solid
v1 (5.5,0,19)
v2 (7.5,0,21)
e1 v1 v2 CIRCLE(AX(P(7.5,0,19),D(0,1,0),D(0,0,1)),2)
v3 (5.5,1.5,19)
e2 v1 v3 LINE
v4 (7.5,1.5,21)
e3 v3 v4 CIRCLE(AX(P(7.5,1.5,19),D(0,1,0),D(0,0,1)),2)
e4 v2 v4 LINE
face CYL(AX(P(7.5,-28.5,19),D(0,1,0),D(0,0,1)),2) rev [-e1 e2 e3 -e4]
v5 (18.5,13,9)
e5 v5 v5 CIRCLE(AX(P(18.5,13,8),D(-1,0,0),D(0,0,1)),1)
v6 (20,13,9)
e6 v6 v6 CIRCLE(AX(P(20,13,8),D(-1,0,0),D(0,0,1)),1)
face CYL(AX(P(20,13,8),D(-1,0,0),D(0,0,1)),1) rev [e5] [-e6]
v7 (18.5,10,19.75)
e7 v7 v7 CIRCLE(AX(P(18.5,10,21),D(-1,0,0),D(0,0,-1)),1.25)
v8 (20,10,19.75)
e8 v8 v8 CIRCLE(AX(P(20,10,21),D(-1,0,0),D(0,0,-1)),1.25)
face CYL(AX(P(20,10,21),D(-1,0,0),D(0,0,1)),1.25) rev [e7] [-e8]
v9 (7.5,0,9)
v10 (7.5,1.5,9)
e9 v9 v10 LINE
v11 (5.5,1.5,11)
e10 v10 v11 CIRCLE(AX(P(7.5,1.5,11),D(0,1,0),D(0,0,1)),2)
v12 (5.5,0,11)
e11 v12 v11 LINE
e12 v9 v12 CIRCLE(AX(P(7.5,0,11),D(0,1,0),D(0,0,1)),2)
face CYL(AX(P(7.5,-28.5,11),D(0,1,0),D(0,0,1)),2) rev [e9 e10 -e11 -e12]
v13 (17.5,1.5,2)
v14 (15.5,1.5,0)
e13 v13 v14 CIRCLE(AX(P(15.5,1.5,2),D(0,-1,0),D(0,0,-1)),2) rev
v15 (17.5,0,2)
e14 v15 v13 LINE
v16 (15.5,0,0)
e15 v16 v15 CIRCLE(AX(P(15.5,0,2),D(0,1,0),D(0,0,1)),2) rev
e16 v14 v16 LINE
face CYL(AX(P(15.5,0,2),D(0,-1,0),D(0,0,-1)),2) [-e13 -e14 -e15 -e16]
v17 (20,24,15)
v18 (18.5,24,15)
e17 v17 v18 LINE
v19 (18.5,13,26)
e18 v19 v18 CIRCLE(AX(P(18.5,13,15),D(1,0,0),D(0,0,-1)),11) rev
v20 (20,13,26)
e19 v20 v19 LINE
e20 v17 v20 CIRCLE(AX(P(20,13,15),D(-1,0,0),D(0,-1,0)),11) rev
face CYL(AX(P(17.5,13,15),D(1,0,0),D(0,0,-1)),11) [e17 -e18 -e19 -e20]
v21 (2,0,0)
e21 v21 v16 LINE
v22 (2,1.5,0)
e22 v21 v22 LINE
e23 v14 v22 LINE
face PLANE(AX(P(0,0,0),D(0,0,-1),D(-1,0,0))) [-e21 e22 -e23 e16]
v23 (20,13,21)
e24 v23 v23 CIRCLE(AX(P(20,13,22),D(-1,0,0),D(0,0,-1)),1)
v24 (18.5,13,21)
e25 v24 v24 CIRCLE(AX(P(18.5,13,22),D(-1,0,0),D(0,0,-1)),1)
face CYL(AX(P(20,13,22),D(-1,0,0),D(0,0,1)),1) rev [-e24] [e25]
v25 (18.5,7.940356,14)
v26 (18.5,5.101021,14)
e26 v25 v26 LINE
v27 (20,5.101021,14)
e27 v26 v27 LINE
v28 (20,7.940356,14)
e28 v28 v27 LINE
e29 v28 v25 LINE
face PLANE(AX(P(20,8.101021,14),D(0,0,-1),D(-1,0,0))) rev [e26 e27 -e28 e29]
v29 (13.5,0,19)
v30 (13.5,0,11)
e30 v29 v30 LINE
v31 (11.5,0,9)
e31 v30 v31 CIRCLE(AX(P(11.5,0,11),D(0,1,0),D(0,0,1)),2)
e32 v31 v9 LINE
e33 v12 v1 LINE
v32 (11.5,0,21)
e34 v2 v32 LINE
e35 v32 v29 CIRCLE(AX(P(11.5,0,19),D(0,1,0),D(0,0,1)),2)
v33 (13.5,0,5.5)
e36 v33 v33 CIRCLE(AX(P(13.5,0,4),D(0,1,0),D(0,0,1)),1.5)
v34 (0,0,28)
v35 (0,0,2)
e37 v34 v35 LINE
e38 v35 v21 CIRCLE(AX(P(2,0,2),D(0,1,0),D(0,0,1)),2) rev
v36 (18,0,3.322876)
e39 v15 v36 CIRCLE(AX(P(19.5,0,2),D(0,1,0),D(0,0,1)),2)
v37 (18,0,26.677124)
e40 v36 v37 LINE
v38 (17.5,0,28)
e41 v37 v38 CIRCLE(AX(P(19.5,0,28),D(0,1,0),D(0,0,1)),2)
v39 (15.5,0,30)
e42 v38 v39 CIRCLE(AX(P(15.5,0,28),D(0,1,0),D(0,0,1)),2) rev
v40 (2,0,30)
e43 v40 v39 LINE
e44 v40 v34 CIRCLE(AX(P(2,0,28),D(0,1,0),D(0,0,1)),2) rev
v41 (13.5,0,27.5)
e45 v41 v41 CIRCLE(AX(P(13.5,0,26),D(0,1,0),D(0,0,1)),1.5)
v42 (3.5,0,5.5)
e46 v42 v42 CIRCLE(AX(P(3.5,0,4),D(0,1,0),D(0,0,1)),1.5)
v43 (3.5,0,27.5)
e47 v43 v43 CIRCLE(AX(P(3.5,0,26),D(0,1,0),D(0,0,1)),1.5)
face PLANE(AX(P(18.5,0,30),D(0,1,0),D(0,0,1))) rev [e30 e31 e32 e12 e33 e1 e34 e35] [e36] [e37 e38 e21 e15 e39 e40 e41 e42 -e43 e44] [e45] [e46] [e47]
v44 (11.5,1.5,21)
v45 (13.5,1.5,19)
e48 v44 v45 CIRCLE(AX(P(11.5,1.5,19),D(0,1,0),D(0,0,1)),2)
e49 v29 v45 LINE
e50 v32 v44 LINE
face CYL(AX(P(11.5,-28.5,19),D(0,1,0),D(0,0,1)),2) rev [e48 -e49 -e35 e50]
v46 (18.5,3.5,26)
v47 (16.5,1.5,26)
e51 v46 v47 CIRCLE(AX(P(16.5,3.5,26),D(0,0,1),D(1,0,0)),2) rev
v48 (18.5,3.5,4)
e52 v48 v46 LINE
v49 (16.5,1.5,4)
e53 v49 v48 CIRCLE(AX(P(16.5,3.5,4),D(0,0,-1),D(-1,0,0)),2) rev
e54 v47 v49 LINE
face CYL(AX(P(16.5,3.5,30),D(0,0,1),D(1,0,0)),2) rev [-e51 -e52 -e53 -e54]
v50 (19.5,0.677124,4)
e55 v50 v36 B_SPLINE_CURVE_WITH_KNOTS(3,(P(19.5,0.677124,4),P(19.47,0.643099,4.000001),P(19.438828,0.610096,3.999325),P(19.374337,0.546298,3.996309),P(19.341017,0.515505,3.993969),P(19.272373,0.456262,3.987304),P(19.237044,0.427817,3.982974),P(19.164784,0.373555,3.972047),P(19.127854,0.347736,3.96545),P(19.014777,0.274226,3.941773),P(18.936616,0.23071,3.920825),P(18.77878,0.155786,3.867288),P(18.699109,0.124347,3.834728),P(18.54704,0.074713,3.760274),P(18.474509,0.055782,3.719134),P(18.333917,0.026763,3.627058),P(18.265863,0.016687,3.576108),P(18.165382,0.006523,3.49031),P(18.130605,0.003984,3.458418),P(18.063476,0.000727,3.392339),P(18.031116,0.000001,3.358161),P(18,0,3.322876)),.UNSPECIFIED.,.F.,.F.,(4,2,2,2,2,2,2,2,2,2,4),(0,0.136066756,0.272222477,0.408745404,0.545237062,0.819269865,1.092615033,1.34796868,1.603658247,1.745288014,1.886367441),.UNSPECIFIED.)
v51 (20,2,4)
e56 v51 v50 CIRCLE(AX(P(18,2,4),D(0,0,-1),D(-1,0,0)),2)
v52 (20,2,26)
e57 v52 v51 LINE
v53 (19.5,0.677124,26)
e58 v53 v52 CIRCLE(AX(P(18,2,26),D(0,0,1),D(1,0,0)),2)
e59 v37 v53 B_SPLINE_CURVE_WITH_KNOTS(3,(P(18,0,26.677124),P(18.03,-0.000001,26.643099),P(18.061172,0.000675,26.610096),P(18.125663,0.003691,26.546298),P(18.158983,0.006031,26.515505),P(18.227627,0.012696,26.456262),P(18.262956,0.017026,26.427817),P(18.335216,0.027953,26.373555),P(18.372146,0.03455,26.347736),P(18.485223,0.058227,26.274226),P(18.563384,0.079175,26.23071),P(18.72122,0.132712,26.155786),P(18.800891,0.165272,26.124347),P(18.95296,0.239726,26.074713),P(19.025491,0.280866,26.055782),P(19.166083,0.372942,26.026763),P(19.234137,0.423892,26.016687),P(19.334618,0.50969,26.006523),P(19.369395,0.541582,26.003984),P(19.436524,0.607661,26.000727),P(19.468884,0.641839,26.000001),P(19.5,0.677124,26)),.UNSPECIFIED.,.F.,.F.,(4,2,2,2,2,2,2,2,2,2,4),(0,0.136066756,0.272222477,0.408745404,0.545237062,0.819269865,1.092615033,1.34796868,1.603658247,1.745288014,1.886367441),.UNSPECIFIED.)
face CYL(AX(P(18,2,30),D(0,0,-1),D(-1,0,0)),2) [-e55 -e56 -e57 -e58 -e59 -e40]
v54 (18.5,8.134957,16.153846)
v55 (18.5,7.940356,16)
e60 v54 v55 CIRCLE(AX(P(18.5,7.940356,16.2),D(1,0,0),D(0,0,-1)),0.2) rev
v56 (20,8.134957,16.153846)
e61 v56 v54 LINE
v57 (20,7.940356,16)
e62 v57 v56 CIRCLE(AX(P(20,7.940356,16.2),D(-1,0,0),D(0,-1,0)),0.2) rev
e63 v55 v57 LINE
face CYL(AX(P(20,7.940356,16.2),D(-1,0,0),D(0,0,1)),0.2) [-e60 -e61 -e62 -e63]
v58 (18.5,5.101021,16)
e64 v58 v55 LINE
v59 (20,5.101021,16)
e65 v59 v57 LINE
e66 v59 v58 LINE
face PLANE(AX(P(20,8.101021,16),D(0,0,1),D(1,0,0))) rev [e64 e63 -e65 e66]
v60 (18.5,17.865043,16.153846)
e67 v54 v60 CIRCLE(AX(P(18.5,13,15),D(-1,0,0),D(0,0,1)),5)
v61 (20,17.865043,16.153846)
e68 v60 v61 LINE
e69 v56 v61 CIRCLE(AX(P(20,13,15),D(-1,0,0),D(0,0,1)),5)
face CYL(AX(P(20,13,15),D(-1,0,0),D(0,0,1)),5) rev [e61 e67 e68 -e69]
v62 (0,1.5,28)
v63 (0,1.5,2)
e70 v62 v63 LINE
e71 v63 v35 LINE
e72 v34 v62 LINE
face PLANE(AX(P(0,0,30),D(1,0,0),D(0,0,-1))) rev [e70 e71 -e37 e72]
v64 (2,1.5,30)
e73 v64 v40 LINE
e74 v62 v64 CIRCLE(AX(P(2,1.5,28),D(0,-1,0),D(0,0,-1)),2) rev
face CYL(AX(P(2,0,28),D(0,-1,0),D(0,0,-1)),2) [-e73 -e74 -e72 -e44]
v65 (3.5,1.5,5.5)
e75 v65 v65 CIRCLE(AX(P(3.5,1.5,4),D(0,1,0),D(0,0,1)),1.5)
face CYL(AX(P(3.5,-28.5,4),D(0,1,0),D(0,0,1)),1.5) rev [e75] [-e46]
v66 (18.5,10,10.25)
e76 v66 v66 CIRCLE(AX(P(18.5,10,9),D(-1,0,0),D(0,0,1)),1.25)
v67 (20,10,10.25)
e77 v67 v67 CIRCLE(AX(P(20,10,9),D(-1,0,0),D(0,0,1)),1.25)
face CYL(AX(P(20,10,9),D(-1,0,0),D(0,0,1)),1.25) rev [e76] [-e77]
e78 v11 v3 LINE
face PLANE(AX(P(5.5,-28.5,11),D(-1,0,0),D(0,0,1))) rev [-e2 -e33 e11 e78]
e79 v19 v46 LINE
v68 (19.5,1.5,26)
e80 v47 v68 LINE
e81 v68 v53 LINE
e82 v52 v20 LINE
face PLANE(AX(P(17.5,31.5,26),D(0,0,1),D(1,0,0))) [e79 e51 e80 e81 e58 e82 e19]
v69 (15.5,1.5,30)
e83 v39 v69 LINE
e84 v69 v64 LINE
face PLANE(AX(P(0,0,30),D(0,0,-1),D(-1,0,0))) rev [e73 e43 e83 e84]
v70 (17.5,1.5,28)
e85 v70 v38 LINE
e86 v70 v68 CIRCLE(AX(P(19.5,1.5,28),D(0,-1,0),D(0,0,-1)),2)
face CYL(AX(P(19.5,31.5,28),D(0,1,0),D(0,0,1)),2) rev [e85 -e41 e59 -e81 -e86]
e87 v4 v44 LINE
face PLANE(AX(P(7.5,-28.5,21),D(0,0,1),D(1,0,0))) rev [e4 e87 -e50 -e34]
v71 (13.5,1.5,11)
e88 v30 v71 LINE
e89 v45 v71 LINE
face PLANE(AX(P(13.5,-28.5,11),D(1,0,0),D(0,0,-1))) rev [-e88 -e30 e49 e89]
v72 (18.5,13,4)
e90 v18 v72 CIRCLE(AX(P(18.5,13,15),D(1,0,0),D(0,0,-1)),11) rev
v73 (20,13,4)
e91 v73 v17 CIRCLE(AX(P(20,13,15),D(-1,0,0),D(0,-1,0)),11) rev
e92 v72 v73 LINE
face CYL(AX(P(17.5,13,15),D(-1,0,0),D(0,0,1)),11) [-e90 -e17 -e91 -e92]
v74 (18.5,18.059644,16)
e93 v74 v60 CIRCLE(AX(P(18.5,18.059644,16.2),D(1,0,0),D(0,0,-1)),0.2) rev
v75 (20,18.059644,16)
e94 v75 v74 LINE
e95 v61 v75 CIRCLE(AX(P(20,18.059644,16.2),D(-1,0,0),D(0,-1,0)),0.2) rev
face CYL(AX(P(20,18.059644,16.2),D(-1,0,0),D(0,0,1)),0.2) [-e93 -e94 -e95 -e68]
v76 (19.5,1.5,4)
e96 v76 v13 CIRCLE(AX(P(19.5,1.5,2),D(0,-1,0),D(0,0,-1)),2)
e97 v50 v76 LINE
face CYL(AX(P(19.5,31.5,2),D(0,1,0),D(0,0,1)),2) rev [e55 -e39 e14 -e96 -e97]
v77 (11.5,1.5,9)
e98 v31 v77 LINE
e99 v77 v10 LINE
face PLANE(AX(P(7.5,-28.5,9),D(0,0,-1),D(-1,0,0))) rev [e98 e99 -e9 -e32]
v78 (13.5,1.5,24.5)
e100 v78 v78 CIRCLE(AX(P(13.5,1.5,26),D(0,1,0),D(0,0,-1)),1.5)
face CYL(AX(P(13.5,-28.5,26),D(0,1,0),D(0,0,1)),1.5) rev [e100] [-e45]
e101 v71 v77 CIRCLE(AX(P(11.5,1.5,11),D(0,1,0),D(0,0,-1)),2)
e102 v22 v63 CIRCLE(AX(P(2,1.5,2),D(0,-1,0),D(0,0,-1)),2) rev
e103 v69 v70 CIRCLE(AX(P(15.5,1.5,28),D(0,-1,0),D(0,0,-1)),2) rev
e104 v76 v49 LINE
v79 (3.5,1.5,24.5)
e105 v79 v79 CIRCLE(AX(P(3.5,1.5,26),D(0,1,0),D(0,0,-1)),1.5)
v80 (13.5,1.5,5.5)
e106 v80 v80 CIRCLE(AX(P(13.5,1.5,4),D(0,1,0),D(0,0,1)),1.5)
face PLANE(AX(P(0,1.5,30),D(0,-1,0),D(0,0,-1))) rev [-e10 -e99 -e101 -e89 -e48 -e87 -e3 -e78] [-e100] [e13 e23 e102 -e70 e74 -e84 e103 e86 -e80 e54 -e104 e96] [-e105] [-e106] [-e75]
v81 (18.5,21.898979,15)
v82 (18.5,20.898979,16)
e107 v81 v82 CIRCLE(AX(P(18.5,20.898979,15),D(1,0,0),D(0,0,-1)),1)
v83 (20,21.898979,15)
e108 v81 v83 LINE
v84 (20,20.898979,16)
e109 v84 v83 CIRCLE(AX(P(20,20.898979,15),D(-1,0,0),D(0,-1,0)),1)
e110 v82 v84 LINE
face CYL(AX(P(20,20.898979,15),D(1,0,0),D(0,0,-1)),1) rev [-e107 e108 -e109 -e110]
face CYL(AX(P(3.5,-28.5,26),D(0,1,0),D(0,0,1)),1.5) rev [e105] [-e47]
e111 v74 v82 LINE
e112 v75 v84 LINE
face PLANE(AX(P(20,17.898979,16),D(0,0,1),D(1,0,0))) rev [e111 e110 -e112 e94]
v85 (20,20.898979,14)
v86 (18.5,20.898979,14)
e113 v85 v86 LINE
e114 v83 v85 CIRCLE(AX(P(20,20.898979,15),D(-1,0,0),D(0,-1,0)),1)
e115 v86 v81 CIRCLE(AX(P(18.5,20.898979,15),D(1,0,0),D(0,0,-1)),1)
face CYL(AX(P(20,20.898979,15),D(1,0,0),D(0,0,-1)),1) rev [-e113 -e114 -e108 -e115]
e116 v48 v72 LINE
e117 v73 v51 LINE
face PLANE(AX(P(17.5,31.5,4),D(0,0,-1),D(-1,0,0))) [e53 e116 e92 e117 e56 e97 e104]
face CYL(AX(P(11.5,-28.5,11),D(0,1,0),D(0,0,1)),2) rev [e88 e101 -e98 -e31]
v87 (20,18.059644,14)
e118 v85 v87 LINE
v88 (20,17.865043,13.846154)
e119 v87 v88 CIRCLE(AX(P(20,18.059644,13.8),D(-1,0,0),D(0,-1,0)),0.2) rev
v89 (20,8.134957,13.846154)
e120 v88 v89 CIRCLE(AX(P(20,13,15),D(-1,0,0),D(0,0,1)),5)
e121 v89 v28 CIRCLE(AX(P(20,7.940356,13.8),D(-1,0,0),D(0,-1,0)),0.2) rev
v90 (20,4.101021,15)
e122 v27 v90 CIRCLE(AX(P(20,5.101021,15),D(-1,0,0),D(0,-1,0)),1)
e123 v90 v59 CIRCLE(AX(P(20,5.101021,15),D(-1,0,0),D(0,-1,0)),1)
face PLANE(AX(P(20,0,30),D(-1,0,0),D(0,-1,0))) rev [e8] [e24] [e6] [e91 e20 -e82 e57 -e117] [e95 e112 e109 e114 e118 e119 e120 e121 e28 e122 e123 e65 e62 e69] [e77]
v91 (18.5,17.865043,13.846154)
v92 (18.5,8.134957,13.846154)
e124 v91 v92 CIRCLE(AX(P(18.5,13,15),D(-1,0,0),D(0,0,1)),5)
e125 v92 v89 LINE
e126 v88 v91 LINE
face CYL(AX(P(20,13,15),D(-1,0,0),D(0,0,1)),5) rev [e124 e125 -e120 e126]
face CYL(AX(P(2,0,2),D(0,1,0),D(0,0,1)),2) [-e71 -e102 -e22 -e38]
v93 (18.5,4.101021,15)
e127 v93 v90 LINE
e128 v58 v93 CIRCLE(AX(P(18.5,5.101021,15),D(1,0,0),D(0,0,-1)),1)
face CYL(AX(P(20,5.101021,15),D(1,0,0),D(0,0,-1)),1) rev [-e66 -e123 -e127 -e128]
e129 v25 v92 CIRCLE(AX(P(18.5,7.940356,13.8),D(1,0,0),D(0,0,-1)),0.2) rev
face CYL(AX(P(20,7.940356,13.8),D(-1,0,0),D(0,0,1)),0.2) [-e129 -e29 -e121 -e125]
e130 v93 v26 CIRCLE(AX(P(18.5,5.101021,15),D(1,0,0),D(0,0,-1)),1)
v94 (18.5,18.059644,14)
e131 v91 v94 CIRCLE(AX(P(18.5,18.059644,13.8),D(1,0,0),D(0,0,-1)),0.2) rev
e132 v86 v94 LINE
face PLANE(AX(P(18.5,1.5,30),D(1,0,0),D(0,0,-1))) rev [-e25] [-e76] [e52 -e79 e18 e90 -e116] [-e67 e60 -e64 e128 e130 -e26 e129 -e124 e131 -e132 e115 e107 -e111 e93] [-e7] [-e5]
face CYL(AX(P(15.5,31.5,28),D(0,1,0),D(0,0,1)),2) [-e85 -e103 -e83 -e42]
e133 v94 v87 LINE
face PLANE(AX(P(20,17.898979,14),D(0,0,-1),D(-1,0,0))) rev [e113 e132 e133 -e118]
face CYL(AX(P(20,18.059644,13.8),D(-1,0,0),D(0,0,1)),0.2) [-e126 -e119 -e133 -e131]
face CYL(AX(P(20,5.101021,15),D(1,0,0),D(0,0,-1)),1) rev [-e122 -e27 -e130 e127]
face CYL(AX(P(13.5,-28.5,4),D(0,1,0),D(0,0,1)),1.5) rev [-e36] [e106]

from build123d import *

# Parameters (mm, degrees)
EXTRUDE_1_DEPTH          = 30
CUT_EXTRUDE_1_DEPTH      = 30
CUT_EXTRUDE_1_DEPTH_BACK = 30
SKETCH_2_W               = 4.827470223
SKETCH_2_H               = 5.659354242
FILLET_1_R               = 11
SKETCH_3_R               = 1.5
CUT_EXTRUDE_2_DEPTH      = 30
SKETCH_4_R               = 1
SKETCH_4_R_2             = 1.25
CUT_EXTRUDE_3_DEPTH      = 43.640942766
FILLET_2_R               = 1
FILLET_3_R               = 0.2
FILLET_4_R               = 2
FILLET_5_R               = 2


# Some blends are built 0.0001 mm under size
with BuildPart() as part:
    # 草图1 → 凸台-拉伸1 (new body)
    with BuildSketch(Plane.XY):
        Polygon((0, 0), (18.5, 0), (20, 0), (20, 24), (18.5, 24), (18.5, 1.5), (0, 1.5), align=None)
    extrude(amount=EXTRUDE_1_DEPTH)

    # 草图2 → 切除-拉伸1 (cut, two sides: drawn at the far end of the back side and taken through both)
    with BuildSketch(Plane(origin=(0, 1.5, 0), x_dir=(1, 0, 0), z_dir=(0, 1, 0)).offset(-CUT_EXTRUDE_1_DEPTH_BACK)):
        with Locations((19.913735112, -1.170322879)):
            Rectangle(SKETCH_2_W, SKETCH_2_H)
        with Locations((19.913735112, -28.829677121)):
            Rectangle(SKETCH_2_W, SKETCH_2_H)
    extrude(amount=CUT_EXTRUDE_1_DEPTH + CUT_EXTRUDE_1_DEPTH_BACK, mode=Mode.SUBTRACT)

    # 圆角1
    fillet_1_edges = [part.edges().sort_by_distance(p)[0] for p in [
        (19.25, 24, 26),
        (19.25, 24, 4),
    ]]
    fillet(fillet_1_edges, radius=FILLET_1_R - 0.0001)  # a hair under: the kernel refuses the full size

    # 草图3 → 切除-拉伸2 (cut)
    with BuildSketch(Plane(origin=(0, 1.5, 0), x_dir=(1, 0, 0), z_dir=(0, 1, 0))):
        with Locations(Location((13.5, -4, 0), (0, 0, 270))):
            Circle(SKETCH_3_R)
        with Locations(Location((3.5, -4, 0), (0, 0, 270))):
            Circle(SKETCH_3_R)
        with Locations(Location((3.5, -26, 0), (0, 0, 270))):
            Circle(SKETCH_3_R)
        with Locations(Location((13.5, -26, 0), (0, 0, 270))):
            Circle(SKETCH_3_R)
        with BuildLine():
            Line((7.5, -9), (11.5, -9))
            ThreePointArc((11.5, -9), (12.914213562, -9.585786438), (13.5, -11))
            Line((13.5, -11), (13.5, -19))
            ThreePointArc((13.5, -19), (12.914213562, -20.414213562), (11.5, -21))
            Line((11.5, -21), (7.5, -21))
            ThreePointArc((7.5, -21), (6.085786438, -20.414213562), (5.5, -19))
            Line((5.5, -19), (5.5, -11))
            ThreePointArc((5.5, -11), (6.085786438, -9.585786438), (7.5, -9))
        make_face()
    extrude(amount=-CUT_EXTRUDE_2_DEPTH, mode=Mode.SUBTRACT)

    # 草图4 → 切除-拉伸3 (cut, through all)
    with BuildSketch(Plane.ZY.offset(-18.5)):
        with Locations((8, 13)):
            Circle(SKETCH_4_R)
        with Locations(Location((22, 13, 0), (0, 0, 180))):
            Circle(SKETCH_4_R)
        with Locations((9, 10)):
            Circle(SKETCH_4_R_2)
        with Locations(Location((21, 10, 0), (0, 0, 180))):
            Circle(SKETCH_4_R_2)
        with BuildLine():
            Line((16, 8.101020514), (16, 4.101020514))
            Line((16, 4.101020514), (14, 4.101020514))
            Line((14, 4.101020514), (14, 8.101020514))
            ThreePointArc((14, 8.101020514), (10, 13), (14, 17.898979486))
            Line((14, 17.898979486), (14, 21.898979486))
            Line((14, 21.898979486), (16, 21.898979486))
            Line((16, 21.898979486), (16, 17.898979486))
            ThreePointArc((16, 17.898979486), (20, 13), (16, 8.101020514))
        make_face()
    extrude(amount=-CUT_EXTRUDE_3_DEPTH, mode=Mode.SUBTRACT)

    # 圆角2
    fillet_2_edges = [part.edges().sort_by_distance(p)[0] for p in [
        (19.25, 4.101020514, 14),
        (19.25, 4.101020514, 16),
        (19.25, 21.898979486, 16),
        (19.25, 21.898979486, 14),
    ]]
    fillet(fillet_2_edges, radius=FILLET_2_R - 0.0001)  # a hair under: the kernel refuses the full size

    # 圆角3
    fillet_3_edges = [part.edges().sort_by_distance(p)[0] for p in [
        (19.25, 8.101020514, 14),
        (19.25, 17.898979486, 14),
        (19.25, 17.898979486, 16),
        (19.25, 8.101020514, 16),
    ]]
    fillet(fillet_3_edges, radius=FILLET_3_R)

    # 圆角4
    # the kernel refuses this fillet: 2 mm, written as the material it adds along each edge
    with BuildSketch(Plane(origin=(17.5, 0, 26), x_dir=(1, 0, 0), z_dir=(0, 1, 0))) as fillet_4_piece_1:
        with BuildLine():
            CenterArc((FILLET_4_R, -FILLET_4_R), FILLET_4_R, 90, 90)
            Line((0, -FILLET_4_R), (0, 0))
            Line((0, 0), (FILLET_4_R, 0))
        make_face()
    extrude(amount=1.5)
    with BuildSketch(Plane(origin=(17.5, 0, 4), x_dir=(1, 0, 0), z_dir=(0, 1, 0))) as fillet_4_piece_2:
        with BuildLine():
            CenterArc((FILLET_4_R, FILLET_4_R), FILLET_4_R, 180, 90)
            Line((0, FILLET_4_R), (0, 0))
            Line((0, 0), (FILLET_4_R, 0))
        make_face()
    extrude(amount=1.5)
    # the kernel refuses this fillet: 2 mm, written as the material it takes off along each edge
    with BuildSketch(Plane(origin=(17.5, 6.5, 0), x_dir=(0, 0, 1), z_dir=(0, -1, 0)), Plane(origin=(17.5, -5, 30), x_dir=(0, 0, -1), z_dir=(0, 1, 0)), Plane(origin=(0, 6.5, 30), x_dir=(0, 0, -1), z_dir=(0, -1, 0)), Plane(origin=(0, 6.5, 0), x_dir=(1, 0, 0), z_dir=(0, -1, 0))) as fillet_4_2_piece_1:
        with BuildLine():
            CenterArc((FILLET_4_R, FILLET_4_R), FILLET_4_R, 180, 90)
            Line((0, FILLET_4_R), (0, 0))
            Line((0, 0), (FILLET_4_R, 0))
        make_face()
    extrude(amount=11.5, mode=Mode.SUBTRACT)

    # 圆角5
    fillet_5_edges = [part.edges().sort_by_distance(p)[0] for p in [
        (20, 0, 15),
        (18.5, 1.5, 15),
    ]]
    fillet(fillet_5_edges, radius=FILLET_5_R)


solid = part.part
